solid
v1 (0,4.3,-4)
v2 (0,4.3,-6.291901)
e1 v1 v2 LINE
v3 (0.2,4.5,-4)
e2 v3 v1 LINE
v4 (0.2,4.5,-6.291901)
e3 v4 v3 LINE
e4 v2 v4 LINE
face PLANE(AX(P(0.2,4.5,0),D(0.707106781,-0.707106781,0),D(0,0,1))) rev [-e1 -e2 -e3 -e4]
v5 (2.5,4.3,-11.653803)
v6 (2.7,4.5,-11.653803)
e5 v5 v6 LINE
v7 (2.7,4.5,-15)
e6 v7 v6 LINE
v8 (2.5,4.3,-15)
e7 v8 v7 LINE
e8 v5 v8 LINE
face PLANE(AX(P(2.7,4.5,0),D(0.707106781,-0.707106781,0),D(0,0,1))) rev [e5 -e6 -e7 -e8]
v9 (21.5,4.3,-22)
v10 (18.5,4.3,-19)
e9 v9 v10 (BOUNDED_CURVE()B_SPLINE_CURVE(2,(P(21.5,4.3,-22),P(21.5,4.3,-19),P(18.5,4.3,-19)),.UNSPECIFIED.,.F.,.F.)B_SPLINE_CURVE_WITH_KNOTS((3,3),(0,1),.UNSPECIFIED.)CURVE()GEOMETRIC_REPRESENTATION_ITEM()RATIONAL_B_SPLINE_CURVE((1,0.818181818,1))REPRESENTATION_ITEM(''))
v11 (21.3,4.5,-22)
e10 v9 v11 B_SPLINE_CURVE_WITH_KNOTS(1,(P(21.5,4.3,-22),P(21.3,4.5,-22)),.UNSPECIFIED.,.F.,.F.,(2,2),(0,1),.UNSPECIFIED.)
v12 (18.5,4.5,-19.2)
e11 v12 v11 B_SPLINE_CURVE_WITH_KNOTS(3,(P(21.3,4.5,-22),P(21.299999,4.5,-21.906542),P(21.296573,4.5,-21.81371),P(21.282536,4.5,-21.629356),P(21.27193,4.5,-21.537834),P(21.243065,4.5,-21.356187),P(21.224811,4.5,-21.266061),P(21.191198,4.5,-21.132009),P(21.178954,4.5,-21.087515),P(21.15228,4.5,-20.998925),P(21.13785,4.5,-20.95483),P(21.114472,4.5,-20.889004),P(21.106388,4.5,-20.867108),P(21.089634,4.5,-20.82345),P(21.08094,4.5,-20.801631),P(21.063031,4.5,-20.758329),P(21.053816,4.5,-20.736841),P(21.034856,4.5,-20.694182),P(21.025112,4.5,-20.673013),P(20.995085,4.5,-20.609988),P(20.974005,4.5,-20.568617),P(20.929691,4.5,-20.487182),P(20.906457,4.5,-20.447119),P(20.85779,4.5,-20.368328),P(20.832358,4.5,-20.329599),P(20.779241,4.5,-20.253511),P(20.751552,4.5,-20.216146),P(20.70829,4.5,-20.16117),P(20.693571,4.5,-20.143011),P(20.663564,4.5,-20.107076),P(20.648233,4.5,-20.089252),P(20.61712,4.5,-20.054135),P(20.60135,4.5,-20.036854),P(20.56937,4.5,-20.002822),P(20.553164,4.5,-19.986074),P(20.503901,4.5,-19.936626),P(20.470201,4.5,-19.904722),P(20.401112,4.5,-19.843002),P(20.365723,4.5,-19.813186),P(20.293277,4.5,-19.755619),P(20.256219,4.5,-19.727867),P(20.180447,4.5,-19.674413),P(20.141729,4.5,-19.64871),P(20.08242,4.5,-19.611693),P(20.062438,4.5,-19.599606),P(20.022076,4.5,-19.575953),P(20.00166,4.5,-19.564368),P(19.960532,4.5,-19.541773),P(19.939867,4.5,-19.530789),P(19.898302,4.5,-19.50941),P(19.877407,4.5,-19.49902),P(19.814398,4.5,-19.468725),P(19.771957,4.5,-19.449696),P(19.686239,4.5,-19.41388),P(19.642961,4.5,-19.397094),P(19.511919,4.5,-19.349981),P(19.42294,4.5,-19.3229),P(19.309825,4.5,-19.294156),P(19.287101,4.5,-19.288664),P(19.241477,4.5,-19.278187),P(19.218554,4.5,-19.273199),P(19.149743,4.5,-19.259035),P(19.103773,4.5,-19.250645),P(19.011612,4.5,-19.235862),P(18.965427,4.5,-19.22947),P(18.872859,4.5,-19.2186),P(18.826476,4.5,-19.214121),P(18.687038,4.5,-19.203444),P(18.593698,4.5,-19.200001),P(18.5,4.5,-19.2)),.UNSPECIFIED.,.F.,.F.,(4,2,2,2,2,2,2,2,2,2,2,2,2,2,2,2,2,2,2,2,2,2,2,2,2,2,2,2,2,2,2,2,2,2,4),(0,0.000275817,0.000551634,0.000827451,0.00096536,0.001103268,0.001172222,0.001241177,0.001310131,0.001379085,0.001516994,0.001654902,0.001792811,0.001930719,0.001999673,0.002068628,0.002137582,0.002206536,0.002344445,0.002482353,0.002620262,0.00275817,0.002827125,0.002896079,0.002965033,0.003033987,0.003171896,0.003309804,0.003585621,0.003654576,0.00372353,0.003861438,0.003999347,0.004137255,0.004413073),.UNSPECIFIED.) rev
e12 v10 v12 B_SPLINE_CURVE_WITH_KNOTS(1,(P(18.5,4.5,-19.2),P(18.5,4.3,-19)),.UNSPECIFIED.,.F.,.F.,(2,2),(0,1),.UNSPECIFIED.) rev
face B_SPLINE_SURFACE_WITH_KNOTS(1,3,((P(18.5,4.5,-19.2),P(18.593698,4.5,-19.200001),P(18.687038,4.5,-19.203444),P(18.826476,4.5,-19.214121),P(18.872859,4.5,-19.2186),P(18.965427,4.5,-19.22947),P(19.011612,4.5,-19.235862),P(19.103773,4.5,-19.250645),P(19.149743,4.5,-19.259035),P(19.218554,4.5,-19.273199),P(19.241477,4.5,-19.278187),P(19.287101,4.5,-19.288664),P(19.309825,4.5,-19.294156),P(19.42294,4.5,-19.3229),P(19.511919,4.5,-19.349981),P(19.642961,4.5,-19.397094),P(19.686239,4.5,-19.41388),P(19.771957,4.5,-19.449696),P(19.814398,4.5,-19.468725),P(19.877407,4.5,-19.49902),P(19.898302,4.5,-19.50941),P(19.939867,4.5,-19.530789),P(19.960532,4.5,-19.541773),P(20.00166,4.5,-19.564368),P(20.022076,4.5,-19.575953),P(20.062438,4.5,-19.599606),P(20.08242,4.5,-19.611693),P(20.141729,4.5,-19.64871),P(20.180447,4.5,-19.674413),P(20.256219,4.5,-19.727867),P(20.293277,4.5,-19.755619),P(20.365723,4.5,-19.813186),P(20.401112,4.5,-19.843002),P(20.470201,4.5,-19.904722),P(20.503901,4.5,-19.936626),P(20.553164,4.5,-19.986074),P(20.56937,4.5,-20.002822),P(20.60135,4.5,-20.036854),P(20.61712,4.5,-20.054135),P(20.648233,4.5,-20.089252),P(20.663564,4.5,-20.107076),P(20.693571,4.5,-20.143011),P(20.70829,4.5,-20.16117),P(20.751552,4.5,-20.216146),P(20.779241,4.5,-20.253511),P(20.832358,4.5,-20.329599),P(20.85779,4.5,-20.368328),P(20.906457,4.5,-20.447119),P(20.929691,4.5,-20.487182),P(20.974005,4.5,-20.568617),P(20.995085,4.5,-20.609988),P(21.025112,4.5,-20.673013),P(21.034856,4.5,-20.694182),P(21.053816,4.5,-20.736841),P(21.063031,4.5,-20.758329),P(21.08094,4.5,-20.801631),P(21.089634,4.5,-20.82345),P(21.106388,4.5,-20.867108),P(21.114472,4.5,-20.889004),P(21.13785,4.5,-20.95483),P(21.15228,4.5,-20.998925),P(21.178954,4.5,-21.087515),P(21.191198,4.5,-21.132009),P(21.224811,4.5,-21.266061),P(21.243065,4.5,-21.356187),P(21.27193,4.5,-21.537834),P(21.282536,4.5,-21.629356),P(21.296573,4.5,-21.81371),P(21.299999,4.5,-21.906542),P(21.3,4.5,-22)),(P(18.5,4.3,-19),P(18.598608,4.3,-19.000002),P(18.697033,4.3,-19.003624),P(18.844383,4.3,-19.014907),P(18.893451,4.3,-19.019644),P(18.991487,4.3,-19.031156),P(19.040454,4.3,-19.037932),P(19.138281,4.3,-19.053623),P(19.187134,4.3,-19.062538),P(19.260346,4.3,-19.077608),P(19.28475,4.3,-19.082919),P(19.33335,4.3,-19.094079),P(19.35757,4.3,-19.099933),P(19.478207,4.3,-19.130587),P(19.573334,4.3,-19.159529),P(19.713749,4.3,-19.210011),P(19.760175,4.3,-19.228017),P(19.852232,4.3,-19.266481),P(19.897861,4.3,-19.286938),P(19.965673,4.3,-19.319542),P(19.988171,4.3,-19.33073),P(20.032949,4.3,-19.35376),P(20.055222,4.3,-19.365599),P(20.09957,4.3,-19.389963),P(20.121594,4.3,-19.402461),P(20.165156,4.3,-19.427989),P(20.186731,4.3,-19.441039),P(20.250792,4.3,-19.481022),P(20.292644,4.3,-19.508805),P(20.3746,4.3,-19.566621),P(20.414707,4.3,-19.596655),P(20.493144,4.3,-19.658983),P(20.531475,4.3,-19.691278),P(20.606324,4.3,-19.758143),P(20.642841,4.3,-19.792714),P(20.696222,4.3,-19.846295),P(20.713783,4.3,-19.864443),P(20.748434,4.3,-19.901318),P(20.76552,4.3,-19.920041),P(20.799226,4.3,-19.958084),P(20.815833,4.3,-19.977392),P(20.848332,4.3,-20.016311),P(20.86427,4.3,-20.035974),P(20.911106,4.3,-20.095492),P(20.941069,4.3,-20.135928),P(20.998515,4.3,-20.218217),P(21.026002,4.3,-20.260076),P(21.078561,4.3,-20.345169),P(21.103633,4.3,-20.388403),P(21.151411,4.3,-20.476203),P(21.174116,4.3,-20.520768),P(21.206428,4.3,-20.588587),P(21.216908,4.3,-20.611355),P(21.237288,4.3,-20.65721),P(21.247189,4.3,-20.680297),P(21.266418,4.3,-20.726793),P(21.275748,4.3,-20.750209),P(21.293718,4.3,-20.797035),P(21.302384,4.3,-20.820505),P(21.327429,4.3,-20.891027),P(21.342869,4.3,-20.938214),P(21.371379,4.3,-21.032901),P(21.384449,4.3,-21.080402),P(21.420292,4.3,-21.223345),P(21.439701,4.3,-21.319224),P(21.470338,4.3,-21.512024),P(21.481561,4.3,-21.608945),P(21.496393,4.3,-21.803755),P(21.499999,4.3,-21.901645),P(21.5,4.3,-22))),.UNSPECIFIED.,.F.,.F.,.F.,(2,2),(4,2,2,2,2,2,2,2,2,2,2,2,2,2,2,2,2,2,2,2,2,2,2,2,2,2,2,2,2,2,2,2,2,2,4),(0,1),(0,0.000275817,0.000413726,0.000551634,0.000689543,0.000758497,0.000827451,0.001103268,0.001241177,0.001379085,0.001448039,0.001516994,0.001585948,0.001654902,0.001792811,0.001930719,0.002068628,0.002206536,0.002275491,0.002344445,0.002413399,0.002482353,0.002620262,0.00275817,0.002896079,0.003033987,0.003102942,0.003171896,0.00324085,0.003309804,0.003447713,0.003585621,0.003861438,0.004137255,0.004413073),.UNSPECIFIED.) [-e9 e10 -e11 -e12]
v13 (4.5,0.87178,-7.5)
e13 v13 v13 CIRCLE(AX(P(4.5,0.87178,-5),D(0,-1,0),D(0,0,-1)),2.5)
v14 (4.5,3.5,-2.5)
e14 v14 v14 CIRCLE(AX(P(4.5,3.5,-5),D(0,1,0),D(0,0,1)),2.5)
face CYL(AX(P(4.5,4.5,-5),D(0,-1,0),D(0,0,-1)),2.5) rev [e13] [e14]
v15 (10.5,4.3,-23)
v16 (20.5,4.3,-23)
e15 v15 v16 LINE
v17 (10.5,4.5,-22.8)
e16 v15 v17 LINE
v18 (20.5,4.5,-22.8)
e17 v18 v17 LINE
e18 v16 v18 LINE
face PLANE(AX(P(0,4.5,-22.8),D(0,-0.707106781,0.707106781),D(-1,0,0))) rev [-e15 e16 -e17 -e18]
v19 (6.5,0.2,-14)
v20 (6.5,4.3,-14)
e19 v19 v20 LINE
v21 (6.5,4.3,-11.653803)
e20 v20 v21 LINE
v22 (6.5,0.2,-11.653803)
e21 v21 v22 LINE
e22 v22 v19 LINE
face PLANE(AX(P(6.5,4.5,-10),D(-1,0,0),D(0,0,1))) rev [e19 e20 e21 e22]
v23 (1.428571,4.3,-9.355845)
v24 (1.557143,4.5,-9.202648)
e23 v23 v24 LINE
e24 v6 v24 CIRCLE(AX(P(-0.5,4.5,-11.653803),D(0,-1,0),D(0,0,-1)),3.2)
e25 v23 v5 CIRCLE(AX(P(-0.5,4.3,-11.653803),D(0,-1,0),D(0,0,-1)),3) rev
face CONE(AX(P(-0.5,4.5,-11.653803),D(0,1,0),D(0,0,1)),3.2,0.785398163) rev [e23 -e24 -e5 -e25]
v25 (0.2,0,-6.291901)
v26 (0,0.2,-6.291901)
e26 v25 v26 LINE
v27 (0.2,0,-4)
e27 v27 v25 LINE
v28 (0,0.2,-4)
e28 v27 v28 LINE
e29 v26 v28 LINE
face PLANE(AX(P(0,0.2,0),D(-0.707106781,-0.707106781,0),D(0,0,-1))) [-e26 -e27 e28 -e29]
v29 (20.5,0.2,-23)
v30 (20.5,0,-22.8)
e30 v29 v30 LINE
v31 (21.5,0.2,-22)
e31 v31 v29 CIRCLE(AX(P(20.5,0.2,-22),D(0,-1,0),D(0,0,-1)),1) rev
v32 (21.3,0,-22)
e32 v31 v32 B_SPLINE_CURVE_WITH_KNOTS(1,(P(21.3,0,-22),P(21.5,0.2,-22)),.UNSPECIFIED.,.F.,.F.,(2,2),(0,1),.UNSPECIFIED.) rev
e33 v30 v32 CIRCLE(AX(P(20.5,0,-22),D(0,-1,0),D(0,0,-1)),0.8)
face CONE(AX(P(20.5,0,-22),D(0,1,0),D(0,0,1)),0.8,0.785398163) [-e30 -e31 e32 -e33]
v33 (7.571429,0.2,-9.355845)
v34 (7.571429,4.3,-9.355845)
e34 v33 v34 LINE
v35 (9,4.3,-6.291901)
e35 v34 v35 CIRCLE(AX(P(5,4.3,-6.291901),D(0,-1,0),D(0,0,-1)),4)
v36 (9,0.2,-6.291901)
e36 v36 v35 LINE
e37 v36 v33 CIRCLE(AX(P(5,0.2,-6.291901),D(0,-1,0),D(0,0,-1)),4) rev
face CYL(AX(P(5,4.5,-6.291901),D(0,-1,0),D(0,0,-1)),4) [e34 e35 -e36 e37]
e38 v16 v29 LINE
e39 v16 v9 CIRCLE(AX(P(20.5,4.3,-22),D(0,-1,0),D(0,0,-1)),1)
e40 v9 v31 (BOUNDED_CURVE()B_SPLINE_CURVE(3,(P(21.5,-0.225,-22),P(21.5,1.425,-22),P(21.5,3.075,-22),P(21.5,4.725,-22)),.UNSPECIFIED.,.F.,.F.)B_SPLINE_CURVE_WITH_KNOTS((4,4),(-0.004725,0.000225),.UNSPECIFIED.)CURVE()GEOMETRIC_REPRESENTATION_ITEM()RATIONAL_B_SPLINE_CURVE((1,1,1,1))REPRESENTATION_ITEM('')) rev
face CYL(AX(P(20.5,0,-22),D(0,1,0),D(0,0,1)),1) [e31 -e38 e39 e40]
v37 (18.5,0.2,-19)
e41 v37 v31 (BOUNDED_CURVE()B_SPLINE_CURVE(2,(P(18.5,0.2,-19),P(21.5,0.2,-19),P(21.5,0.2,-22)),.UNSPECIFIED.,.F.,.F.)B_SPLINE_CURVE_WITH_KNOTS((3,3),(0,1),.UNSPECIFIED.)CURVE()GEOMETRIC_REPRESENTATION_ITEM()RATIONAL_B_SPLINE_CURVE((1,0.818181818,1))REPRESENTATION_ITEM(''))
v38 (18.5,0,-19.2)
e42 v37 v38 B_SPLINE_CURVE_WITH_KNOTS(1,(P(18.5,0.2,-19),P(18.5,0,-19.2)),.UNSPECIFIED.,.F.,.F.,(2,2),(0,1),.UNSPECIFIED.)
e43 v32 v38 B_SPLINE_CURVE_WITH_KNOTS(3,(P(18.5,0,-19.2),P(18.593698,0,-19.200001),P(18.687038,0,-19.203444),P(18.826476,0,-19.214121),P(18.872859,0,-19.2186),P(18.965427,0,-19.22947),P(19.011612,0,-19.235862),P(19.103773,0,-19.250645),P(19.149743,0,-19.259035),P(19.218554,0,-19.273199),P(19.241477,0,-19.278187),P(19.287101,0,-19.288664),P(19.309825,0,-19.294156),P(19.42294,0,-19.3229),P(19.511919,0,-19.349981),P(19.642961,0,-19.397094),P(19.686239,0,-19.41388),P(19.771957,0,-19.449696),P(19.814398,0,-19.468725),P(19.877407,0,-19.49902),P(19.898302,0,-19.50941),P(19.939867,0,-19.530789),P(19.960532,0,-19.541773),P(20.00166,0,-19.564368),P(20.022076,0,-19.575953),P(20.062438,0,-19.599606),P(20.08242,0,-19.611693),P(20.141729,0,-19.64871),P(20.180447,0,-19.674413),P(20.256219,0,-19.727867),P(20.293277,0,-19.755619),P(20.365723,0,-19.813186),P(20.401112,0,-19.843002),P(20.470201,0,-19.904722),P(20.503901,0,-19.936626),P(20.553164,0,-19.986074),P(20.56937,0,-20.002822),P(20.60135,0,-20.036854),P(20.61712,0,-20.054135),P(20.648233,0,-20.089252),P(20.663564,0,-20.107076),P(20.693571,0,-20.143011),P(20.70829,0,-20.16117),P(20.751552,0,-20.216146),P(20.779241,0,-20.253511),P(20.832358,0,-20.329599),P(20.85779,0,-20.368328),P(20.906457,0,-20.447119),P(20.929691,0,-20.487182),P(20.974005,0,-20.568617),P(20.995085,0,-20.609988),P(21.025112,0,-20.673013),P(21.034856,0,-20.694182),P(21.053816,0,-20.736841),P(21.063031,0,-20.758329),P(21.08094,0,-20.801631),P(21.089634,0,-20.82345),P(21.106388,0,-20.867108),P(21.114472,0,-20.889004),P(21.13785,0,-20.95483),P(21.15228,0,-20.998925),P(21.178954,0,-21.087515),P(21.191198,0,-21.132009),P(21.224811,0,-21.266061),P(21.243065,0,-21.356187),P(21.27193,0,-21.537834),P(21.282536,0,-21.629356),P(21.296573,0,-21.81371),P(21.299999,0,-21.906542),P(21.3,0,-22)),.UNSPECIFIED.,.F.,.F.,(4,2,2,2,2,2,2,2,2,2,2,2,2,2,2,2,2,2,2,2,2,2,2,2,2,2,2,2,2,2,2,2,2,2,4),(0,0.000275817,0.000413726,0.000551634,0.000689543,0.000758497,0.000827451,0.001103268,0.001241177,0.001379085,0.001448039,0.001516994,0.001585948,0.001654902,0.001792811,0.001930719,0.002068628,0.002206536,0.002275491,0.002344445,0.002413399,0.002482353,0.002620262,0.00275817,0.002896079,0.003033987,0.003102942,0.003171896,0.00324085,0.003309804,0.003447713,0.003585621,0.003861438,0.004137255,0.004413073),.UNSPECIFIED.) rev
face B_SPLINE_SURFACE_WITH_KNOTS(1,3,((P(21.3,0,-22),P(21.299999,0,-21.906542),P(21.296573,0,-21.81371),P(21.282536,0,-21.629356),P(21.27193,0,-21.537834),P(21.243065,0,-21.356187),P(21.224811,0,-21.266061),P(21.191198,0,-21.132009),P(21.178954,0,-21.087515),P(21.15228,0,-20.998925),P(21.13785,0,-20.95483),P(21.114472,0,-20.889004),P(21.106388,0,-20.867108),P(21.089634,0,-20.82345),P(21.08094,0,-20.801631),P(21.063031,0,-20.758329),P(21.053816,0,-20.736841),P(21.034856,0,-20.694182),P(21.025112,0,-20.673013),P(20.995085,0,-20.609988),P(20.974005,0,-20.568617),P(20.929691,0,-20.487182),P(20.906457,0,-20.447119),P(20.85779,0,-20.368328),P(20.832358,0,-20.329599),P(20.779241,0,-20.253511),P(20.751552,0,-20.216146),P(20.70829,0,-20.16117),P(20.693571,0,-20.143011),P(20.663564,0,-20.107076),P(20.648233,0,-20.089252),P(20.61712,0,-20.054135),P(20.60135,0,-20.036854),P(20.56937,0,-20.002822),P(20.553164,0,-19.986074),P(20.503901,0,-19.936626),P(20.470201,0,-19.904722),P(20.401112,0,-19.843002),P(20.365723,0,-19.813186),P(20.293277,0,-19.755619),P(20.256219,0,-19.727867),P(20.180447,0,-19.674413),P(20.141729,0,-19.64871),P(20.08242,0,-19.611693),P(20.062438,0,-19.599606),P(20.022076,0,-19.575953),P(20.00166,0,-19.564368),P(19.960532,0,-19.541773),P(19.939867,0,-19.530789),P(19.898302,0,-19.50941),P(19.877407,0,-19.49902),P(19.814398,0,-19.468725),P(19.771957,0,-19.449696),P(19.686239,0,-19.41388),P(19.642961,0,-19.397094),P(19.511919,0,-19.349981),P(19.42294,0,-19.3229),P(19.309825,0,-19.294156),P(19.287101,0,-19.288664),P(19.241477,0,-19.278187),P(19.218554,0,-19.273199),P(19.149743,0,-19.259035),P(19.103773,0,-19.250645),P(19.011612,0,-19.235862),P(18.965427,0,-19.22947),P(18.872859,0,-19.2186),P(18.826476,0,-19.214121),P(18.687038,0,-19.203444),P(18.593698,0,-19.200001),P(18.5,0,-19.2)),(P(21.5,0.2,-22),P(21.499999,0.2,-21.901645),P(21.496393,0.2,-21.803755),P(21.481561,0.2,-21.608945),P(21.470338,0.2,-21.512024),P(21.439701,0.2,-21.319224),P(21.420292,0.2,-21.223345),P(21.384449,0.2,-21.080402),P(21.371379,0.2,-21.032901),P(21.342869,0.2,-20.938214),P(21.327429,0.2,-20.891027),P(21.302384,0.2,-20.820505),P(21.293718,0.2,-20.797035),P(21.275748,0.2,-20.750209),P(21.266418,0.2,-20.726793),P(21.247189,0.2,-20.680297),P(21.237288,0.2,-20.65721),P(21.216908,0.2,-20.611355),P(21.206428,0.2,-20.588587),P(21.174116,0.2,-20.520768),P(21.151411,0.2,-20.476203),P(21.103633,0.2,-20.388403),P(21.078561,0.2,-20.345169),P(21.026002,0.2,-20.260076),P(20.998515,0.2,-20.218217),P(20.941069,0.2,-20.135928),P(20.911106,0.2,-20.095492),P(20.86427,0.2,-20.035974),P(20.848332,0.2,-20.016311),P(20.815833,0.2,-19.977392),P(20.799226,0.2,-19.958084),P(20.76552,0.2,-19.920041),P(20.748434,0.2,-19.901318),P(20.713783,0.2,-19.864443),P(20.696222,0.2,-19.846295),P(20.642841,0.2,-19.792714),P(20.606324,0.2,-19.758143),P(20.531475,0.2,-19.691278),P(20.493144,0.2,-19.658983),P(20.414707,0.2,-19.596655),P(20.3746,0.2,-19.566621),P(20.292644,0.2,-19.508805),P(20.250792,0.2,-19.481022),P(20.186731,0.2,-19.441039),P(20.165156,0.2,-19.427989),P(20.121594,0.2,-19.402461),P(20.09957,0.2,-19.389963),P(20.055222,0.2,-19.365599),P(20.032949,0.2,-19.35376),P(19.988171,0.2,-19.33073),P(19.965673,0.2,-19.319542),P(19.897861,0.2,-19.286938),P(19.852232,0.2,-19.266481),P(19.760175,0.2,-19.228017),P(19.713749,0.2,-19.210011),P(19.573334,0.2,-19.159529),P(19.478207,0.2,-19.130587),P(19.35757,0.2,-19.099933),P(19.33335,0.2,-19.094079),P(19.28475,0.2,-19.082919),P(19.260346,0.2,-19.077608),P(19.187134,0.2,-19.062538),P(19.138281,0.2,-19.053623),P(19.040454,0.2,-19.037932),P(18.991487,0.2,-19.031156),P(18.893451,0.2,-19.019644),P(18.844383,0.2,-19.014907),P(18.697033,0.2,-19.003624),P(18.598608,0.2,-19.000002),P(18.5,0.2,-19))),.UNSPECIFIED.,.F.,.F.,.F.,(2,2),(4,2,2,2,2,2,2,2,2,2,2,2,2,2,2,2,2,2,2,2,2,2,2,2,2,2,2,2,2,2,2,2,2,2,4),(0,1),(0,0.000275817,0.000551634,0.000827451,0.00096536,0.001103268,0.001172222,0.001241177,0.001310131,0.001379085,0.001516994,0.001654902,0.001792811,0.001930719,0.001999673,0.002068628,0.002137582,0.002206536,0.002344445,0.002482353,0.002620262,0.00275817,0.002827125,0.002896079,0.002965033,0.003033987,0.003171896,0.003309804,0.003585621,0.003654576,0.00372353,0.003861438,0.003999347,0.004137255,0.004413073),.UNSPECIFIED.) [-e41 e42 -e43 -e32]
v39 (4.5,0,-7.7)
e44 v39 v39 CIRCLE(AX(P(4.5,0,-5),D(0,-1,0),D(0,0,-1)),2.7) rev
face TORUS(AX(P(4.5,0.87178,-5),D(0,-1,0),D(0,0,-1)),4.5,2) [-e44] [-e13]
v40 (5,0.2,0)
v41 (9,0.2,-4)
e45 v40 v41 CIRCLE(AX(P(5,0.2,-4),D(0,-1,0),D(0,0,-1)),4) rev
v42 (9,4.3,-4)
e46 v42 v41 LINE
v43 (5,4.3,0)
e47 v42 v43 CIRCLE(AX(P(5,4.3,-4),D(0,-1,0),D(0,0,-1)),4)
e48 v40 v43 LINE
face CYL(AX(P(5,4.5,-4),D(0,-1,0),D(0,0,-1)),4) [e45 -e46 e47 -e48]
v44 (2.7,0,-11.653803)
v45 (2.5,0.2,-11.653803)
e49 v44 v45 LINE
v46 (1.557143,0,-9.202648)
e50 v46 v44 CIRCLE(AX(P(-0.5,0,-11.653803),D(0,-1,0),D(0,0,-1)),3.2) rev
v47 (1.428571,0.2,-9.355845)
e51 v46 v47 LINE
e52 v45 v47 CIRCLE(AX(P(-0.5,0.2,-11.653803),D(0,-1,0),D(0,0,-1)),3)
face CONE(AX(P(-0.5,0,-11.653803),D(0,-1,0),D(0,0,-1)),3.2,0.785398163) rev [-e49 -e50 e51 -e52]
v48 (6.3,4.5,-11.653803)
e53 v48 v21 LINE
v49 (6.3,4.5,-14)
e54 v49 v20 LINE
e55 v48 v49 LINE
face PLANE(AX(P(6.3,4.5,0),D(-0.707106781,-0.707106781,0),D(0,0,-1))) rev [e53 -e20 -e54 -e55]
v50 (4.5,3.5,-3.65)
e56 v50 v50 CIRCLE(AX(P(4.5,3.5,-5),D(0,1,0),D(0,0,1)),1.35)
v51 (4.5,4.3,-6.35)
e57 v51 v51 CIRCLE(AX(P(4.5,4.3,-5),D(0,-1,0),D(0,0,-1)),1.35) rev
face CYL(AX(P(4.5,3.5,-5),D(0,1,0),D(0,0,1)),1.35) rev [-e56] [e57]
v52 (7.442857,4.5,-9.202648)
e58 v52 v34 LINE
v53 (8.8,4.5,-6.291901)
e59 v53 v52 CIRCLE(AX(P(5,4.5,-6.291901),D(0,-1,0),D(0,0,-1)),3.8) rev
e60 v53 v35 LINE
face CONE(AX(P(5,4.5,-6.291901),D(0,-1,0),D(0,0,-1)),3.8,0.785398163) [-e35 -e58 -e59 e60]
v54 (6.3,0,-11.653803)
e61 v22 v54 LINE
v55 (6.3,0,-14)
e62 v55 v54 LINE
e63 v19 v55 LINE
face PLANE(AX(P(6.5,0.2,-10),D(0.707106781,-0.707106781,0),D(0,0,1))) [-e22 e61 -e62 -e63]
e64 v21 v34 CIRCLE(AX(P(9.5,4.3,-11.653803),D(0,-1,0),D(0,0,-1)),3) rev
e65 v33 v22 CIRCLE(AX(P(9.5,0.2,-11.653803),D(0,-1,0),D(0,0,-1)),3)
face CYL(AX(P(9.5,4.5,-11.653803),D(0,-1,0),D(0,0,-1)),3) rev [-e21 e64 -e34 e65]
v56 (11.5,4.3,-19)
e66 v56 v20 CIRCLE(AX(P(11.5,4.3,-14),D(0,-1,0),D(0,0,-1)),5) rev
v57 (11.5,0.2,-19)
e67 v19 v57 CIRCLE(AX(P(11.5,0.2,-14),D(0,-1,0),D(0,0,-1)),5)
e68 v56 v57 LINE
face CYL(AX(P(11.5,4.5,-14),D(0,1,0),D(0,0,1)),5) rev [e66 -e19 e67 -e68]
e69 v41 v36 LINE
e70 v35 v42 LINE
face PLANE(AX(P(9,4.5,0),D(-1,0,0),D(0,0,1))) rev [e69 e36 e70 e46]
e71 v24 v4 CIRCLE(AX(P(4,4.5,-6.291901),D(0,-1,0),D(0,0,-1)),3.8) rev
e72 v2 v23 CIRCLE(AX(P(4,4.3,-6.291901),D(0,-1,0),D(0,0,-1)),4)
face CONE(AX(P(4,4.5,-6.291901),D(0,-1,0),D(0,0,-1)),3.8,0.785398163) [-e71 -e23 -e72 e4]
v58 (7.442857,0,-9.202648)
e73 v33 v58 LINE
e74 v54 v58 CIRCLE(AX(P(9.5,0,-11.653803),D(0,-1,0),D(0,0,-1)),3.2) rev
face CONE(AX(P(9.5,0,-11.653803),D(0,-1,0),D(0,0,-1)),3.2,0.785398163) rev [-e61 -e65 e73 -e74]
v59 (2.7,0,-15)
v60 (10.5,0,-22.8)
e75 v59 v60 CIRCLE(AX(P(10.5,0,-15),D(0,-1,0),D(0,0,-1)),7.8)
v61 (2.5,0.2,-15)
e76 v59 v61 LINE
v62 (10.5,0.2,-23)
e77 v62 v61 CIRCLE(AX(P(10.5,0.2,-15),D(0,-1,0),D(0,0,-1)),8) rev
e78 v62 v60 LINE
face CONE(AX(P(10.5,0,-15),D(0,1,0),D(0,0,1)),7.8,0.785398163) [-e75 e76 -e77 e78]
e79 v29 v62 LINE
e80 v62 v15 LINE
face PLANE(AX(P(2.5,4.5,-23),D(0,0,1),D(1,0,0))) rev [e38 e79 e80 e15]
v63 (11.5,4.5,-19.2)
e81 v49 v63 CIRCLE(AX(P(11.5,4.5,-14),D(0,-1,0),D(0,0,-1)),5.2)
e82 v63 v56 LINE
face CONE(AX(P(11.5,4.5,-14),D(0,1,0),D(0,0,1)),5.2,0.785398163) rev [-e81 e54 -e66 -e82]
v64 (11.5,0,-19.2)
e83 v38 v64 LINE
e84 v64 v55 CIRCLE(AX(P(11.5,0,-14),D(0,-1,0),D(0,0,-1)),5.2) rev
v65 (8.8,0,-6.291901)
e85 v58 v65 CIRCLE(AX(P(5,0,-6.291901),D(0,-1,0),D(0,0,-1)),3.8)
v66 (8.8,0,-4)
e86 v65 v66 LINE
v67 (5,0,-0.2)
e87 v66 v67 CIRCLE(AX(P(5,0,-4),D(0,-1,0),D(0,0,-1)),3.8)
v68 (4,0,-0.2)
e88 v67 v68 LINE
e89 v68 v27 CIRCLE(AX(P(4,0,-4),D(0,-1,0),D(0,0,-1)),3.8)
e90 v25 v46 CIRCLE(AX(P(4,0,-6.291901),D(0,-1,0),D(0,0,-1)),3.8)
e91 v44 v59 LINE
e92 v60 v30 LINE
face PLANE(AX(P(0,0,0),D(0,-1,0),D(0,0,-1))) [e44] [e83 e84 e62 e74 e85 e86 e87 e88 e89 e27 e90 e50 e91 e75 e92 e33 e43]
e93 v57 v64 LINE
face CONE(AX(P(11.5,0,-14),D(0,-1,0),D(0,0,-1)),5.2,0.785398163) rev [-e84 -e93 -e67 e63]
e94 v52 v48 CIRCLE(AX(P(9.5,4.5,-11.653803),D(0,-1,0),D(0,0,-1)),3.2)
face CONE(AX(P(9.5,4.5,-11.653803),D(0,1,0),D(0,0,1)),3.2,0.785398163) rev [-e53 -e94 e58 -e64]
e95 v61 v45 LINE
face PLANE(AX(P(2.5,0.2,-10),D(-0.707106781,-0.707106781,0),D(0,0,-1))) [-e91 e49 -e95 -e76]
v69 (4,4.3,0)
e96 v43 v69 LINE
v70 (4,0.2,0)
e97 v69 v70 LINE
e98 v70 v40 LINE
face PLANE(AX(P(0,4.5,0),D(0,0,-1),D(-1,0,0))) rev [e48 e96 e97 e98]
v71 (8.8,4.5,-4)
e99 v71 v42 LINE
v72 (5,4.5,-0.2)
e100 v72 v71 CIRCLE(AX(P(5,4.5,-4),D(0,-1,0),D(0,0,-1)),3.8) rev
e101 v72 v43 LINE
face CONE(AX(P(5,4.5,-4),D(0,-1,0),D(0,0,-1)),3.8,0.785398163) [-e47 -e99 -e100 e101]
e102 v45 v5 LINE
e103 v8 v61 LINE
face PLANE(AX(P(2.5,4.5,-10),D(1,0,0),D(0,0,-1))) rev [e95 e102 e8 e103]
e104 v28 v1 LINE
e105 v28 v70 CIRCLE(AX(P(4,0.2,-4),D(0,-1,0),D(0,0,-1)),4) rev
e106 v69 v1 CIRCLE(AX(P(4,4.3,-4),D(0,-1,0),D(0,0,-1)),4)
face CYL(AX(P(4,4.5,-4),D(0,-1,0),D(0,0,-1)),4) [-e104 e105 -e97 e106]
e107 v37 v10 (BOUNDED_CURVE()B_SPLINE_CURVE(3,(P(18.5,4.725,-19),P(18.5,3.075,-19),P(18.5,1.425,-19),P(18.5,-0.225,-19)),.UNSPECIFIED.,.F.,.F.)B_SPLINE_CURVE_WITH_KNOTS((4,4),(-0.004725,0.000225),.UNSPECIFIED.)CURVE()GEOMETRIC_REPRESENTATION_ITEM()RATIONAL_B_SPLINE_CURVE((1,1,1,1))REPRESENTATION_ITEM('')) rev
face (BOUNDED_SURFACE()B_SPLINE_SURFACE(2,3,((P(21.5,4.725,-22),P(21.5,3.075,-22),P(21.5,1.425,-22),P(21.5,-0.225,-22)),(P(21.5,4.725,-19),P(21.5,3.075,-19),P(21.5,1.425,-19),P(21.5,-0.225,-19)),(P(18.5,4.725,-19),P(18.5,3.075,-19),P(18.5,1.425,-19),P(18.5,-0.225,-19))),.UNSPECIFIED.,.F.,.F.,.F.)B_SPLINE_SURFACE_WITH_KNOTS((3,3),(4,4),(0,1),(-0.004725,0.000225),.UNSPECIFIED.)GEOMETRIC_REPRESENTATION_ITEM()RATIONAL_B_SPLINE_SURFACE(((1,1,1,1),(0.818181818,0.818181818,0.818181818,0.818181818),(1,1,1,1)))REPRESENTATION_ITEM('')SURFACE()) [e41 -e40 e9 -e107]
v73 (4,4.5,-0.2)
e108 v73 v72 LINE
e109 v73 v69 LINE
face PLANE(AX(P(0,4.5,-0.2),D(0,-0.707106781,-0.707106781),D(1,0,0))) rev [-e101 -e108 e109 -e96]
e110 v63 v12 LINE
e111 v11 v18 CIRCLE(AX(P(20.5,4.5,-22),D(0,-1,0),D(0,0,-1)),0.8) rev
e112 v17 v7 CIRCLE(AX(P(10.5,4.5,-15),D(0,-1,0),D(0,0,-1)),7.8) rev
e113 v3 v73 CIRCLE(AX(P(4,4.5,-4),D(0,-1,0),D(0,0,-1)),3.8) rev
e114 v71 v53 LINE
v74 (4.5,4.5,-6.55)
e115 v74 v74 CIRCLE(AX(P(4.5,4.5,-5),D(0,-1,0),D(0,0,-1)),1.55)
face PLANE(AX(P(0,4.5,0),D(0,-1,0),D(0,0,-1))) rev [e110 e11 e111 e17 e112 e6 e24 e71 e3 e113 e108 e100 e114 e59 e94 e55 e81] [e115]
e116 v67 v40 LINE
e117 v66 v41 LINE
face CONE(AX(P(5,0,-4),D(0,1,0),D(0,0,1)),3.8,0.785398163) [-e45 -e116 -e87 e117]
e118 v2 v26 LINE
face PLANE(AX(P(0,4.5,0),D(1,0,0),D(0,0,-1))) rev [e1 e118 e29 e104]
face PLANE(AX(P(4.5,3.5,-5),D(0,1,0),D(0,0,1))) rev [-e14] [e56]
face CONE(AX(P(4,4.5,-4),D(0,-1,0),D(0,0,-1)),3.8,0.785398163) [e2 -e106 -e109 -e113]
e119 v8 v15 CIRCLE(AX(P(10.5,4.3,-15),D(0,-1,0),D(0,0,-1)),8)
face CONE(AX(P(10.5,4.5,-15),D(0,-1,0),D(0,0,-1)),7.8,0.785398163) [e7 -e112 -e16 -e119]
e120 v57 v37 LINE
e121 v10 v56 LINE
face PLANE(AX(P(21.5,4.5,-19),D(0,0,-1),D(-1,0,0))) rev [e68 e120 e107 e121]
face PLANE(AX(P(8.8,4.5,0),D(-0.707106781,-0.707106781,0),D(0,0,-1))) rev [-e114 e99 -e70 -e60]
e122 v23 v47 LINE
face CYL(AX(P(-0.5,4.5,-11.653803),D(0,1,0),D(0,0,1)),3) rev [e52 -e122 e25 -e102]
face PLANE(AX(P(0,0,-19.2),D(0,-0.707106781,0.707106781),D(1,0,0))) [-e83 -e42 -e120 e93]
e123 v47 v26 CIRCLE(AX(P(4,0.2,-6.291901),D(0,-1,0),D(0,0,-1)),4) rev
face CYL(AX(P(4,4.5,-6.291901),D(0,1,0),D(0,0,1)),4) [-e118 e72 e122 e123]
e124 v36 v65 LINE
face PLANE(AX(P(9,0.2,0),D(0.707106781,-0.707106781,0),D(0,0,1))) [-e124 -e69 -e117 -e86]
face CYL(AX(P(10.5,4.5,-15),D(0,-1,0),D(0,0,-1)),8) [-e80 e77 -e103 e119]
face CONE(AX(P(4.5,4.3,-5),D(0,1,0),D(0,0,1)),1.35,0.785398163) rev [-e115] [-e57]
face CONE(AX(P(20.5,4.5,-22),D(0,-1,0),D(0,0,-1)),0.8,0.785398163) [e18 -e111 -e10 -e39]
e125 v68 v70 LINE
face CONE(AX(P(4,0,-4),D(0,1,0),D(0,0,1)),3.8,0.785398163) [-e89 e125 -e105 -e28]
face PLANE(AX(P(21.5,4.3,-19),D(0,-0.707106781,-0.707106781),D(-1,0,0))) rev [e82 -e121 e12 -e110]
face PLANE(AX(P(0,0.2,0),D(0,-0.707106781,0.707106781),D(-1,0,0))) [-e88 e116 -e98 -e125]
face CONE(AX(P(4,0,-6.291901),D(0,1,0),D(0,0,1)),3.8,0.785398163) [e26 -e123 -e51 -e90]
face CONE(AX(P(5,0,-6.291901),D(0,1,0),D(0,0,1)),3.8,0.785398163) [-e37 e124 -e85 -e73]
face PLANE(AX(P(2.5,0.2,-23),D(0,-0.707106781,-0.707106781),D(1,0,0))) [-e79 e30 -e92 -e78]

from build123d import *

# Parameters (mm, degrees)
SKETCH_1_R      = 2.4999999999999996
EXTRUDE_1_DEPTH = 4.5
EXTRUDE_START   = -1
SKETCH_3_R      = 2.4999999999999996
SKETCH_3_R_2    = 1.3499999999999994
EXTRUDE_3_DEPTH = 1
EXTRUDE_4_DEPTH = 15
FILLET_1_SIZE   = 3
FILLET_3_R      = 5
FILLET_4_R      = 8
FILLET_5_R      = 4
FILLET_6_R      = 3
FILLET_7_R      = 1
CHAMFER_3_SIZE  = 0.2
FILLET_8_R      = 2


# Some blends are built 0.0001 mm under size
with BuildPart() as part:
    # 草图1 → 凸台-拉伸1 (new body)
    with BuildSketch(Plane(origin=(0, 0, 0), x_dir=(1, 0, 0), z_dir=(0, 1, 0))):
        Polygon((6.500000000000001, 10), (9, 10), (9, 0), (0, 0), (0, 10), (2.499999999999998, 10), (2.500000000000002, 23), (6.500000000000003, 23), align=None)
        with Locations(Location((4.5, 5.000000000000001, 0), (0, 0, 270))):
            Circle(SKETCH_1_R, mode=Mode.SUBTRACT)
    extrude(amount=EXTRUDE_1_DEPTH)

    # 草图3 → 凸台-拉伸3 (add)
    with BuildSketch(Plane(origin=(0, 4.5, 0), x_dir=(1, 0, 0), z_dir=(0, 1, 0)).offset(EXTRUDE_START)):
        with Locations(Location((4.5, 5.000000000000001, 0), (0, 0, 270))):
            Circle(SKETCH_3_R)
        with Locations(Location((4.5, 5.000000000000001, 0), (0, 0, 270))):
            Circle(SKETCH_3_R_2, mode=Mode.SUBTRACT)
    extrude(amount=EXTRUDE_3_DEPTH)

    # 草图4 → 凸台-拉伸4 (add)
    with BuildSketch(Plane(origin=(6.499999999999999, 0, 8.7e-16), x_dir=(-2.9e-16, 0, -1), z_dir=(1, 0, -2.9e-16))):
        Polygon((23, 4.5), (19, 4.499999999999999), (19, 0), (23, 1.2e-16), align=None)
    extrude(amount=EXTRUDE_4_DEPTH)

    # 圆角1
    # a fillet whose section is not a circle: 3 mm, written as the material it takes off along each edge
    with BuildSketch(Plane(origin=(21.499999999999993, 12, -19.000000000000004), x_dir=(-1, 0, 0), z_dir=(0, -1, 0))) as fillet_1_piece_1:
        with BuildLine():
            Bezier((FILLET_1_SIZE, 0), (0, 0), (0, FILLET_1_SIZE), weights=[1, 0.818181818181818, 1])
            Line((0, FILLET_1_SIZE), (0, 0))
            Line((0, 0), (FILLET_1_SIZE, 0))
        make_face()
    extrude(amount=19.5, mode=Mode.SUBTRACT)

    # 圆角3
    fillet_3_edges = [part.edges().sort_by_distance(p)[0] for p in [
        (6.499999999999994, 2.2499999999999996, -19),
    ]]
    fillet(fillet_3_edges, radius=FILLET_3_R)

    # 圆角4
    fillet_4_edges = [part.edges().sort_by_distance(p)[0] for p in [
        (2.500000000000002, 2.25, -23),
    ]]
    fillet(fillet_4_edges, radius=FILLET_4_R)

    # 圆角5
    # the kernel refuses this fillet: 4 mm, written as the material it takes off along each edge
    with BuildSketch(Plane(origin=(9, -10, 0), x_dir=(-1, 0, 0), z_dir=(0, 1, 0))) as fillet_5_piece_1:
        with BuildLine():
            CenterArc((FILLET_5_R, -FILLET_5_R), FILLET_5_R, 90, 90)
            Line((0, -FILLET_5_R), (-FILLET_5_R * 0.02, -FILLET_5_R))
            Line((-FILLET_5_R * 0.02, -FILLET_5_R), (-FILLET_5_R * 0.02, FILLET_5_R * 0.02))
            Line((-FILLET_5_R * 0.02, FILLET_5_R * 0.02), (FILLET_5_R, FILLET_5_R * 0.02))
            Line((FILLET_5_R, FILLET_5_R * 0.02), (FILLET_5_R, 0))
        make_face()
    extrude(amount=24.5, mode=Mode.SUBTRACT)
    with BuildSketch(Plane(origin=(0, -10, 0), x_dir=(0, 0, -1), z_dir=(0, 1, 0))) as fillet_5_piece_2:
        with BuildLine():
            CenterArc((FILLET_5_R, -FILLET_5_R), FILLET_5_R, 90, 90)
            Line((-4.4e-16, -FILLET_5_R), (-FILLET_5_R * 0.02, -FILLET_5_R))
            Line((-FILLET_5_R * 0.02, -FILLET_5_R), (-FILLET_5_R * 0.02, FILLET_5_R * 0.02))
            Line((-FILLET_5_R * 0.02, FILLET_5_R * 0.02), (FILLET_5_R, FILLET_5_R * 0.02))
            Line((FILLET_5_R, FILLET_5_R * 0.02), (FILLET_5_R, 0))
        make_face()
    extrude(amount=24.5, mode=Mode.SUBTRACT)
    with BuildSketch(Plane(origin=(9, -9.27024810886958, -10), x_dir=(0, 0, 1), z_dir=(0, 1, 0))) as fillet_5_piece_3:
        with BuildLine():
            CenterArc((3.7080992435478315, -4), FILLET_5_R, 90, 67.97568716295783)
            Line((0, -2.499999999999999), (-0.07416198487095649, -2.469999999999999))
            ThreePointArc((-0.07416198487095649, -2.469999999999999), (-0.08000000000000007, -1.25), (-0.08000000000000007, 0))
            Line((-0.08000000000000007, 0), (0, 0.08000000000000007))
            Line((0, 0.08000000000000007), (3.7080992435478315, 0.08000000000000007))
            Line((3.7080992435478315, 0.08000000000000007), (3.7080992435478315, 0))
        make_face()
    extrude(amount=23.04049621773916, mode=Mode.SUBTRACT)
    with BuildSketch(Plane(origin=(0, -9.270248108869577, -10), x_dir=(1, 0, 0), z_dir=(0, 1, 0))) as fillet_5_piece_4:
        with BuildLine():
            CenterArc((4, -3.7080992435478306), FILLET_5_R, 112.0243128370422, 67.9756871629578)
            Line((0, -3.7080992435478306), (-0.08, -3.7080992435478306))
            Line((-0.08, -3.7080992435478306), (-0.08, 0))
            Line((-0.08, 0), (0, 0.08000000000000007))
            ThreePointArc((0, 0.08000000000000007), (1.249999999999999, 0.08000000000000007), (2.4699999999999975, 0.07416198487095649))
            Line((2.4699999999999975, 0.07416198487095649), (2.499999999999998, 0))
        make_face()
    extrude(amount=23.040496217739154, mode=Mode.SUBTRACT)

    # 圆角6
    fillet_6_edges = [part.edges().sort_by_distance(p)[0] for p in [
        (2.499999999999998, 2.25, -10),
        (6.500000000000001, 2.25, -10),
    ]]
    fillet(fillet_6_edges, radius=FILLET_6_R)

    # 圆角7
    fillet_7_edges = [part.edges().sort_by_distance(p)[0] for p in [
        (21.499999999999993, 2.25, -23.000000000000004),
    ]]
    fillet(fillet_7_edges, radius=FILLET_7_R - 0.0001)  # a hair under: the kernel refuses the full size

    # 倒角3
    chamfer_3_edges = [part.edges().sort_by_distance(p)[0] for p in [
        (4.5, 4.5, -6.3500000000000005),
        (15, 4.499999999999999, -19.000000000000004),
        (7.964466094067261, 4.5, -17.535533905932738),
        (7.964466094067261, 0, -17.535533905932738),
        (6.500000000000001, 4.5, -12.826901701916901),
        (6.500000000000001, 0, -12.826901701916901),
        (6.781019098475102, 4.5, -10.386072021741027),
        (6.781019098475102, 0, -10.386072021741027),
        (8.625307868699863, 0, -7.982209265909031),
        (8.625307868699863, 4.5, -7.982209265909031),
        (9, 4.5, -5.145950378226),
        (9, 0, -5.145950378226),
        (7.828427124746191, 4.5, -1.1715728752538102),
        (7.828427124746191, 0, -1.1715728752538102),
        (4.5, 0, 0),
        (4.5, 4.5, 0),
        (1.1715728752538102, 4.5, -1.1715728752538093),
        (1.1715728752538102, 0, -1.1715728752538093),
        (0, 0, -5.145950378226),
        (0, 4.5, -5.145950378226),
        (0.37469213130013657, 4.5, -7.982209265909032),
        (0.37469213130013657, 0, -7.982209265909032),
        (2.2189809015248967, 4.5, -10.386072021741029),
        (2.2189809015248967, 0, -10.386072021741029),
        (2.499999999999999, 0, -13.3269017019169),
        (2.499999999999999, 4.5, -13.3269017019169),
        (4.84314575050762, 4.5, -20.65685424949238),
        (4.84314575050762, 0, -20.65685424949238),
        (15.500049999999996, 4.5, -23.000000000000004),
        (15.500049999999996, 8e-17, -23.000000000000004),
        (21.207136070508422, 0, -22.70713607050843),
        (21.207136070508422, 4.5, -22.70713607050843),
        (20.675000000000082, 4.5, -19.82499999999992),
        (20.675000000000082, 0, -19.82499999999992),
        (4.500000000000001, 0, -7.5),
        (15, 0, -19.000000000000004),
    ]]
    chamfer(chamfer_3_edges, length=CHAMFER_3_SIZE)

    # 圆角8
    # the kernel refuses this fillet: 2 mm, written as the material it takes off along each edge
    with BuildSketch(Plane(origin=(4.5, 0.2, -5.000000000000001), x_dir=(-3.6e-16, 0, 1), z_dir=(-1, 0, -3.6e-16))) as fillet_8_piece_1:
        with BuildLine():
            CenterArc((4.499999999999999, 0.6717797887081369), FILLET_8_R, 180, 25.841932763167165)
            Line((2.499999999999999, 0.6717797887081369), (2.459999999999999, 0.6717797887081369))
            Line((2.459999999999999, 0.6717797887081369), (2.459999999999999, 0))
            Line((2.459999999999999, 0), (2.471715728752537, -0.02828427124746191))
            ThreePointArc((2.471715728752537, -0.02828427124746191), (2.5717157287525376, -0.1282842712474619), (2.6640000000000006, -0.21743559577416274))
            Line((2.6640000000000006, -0.21743559577416274), (2.7, -0.2))
        make_face()
    revolve(axis=Axis((4.5, 0.2, -5.000000000000001), (0, 1, 0)), mode=Mode.SUBTRACT)


solid = part.part
